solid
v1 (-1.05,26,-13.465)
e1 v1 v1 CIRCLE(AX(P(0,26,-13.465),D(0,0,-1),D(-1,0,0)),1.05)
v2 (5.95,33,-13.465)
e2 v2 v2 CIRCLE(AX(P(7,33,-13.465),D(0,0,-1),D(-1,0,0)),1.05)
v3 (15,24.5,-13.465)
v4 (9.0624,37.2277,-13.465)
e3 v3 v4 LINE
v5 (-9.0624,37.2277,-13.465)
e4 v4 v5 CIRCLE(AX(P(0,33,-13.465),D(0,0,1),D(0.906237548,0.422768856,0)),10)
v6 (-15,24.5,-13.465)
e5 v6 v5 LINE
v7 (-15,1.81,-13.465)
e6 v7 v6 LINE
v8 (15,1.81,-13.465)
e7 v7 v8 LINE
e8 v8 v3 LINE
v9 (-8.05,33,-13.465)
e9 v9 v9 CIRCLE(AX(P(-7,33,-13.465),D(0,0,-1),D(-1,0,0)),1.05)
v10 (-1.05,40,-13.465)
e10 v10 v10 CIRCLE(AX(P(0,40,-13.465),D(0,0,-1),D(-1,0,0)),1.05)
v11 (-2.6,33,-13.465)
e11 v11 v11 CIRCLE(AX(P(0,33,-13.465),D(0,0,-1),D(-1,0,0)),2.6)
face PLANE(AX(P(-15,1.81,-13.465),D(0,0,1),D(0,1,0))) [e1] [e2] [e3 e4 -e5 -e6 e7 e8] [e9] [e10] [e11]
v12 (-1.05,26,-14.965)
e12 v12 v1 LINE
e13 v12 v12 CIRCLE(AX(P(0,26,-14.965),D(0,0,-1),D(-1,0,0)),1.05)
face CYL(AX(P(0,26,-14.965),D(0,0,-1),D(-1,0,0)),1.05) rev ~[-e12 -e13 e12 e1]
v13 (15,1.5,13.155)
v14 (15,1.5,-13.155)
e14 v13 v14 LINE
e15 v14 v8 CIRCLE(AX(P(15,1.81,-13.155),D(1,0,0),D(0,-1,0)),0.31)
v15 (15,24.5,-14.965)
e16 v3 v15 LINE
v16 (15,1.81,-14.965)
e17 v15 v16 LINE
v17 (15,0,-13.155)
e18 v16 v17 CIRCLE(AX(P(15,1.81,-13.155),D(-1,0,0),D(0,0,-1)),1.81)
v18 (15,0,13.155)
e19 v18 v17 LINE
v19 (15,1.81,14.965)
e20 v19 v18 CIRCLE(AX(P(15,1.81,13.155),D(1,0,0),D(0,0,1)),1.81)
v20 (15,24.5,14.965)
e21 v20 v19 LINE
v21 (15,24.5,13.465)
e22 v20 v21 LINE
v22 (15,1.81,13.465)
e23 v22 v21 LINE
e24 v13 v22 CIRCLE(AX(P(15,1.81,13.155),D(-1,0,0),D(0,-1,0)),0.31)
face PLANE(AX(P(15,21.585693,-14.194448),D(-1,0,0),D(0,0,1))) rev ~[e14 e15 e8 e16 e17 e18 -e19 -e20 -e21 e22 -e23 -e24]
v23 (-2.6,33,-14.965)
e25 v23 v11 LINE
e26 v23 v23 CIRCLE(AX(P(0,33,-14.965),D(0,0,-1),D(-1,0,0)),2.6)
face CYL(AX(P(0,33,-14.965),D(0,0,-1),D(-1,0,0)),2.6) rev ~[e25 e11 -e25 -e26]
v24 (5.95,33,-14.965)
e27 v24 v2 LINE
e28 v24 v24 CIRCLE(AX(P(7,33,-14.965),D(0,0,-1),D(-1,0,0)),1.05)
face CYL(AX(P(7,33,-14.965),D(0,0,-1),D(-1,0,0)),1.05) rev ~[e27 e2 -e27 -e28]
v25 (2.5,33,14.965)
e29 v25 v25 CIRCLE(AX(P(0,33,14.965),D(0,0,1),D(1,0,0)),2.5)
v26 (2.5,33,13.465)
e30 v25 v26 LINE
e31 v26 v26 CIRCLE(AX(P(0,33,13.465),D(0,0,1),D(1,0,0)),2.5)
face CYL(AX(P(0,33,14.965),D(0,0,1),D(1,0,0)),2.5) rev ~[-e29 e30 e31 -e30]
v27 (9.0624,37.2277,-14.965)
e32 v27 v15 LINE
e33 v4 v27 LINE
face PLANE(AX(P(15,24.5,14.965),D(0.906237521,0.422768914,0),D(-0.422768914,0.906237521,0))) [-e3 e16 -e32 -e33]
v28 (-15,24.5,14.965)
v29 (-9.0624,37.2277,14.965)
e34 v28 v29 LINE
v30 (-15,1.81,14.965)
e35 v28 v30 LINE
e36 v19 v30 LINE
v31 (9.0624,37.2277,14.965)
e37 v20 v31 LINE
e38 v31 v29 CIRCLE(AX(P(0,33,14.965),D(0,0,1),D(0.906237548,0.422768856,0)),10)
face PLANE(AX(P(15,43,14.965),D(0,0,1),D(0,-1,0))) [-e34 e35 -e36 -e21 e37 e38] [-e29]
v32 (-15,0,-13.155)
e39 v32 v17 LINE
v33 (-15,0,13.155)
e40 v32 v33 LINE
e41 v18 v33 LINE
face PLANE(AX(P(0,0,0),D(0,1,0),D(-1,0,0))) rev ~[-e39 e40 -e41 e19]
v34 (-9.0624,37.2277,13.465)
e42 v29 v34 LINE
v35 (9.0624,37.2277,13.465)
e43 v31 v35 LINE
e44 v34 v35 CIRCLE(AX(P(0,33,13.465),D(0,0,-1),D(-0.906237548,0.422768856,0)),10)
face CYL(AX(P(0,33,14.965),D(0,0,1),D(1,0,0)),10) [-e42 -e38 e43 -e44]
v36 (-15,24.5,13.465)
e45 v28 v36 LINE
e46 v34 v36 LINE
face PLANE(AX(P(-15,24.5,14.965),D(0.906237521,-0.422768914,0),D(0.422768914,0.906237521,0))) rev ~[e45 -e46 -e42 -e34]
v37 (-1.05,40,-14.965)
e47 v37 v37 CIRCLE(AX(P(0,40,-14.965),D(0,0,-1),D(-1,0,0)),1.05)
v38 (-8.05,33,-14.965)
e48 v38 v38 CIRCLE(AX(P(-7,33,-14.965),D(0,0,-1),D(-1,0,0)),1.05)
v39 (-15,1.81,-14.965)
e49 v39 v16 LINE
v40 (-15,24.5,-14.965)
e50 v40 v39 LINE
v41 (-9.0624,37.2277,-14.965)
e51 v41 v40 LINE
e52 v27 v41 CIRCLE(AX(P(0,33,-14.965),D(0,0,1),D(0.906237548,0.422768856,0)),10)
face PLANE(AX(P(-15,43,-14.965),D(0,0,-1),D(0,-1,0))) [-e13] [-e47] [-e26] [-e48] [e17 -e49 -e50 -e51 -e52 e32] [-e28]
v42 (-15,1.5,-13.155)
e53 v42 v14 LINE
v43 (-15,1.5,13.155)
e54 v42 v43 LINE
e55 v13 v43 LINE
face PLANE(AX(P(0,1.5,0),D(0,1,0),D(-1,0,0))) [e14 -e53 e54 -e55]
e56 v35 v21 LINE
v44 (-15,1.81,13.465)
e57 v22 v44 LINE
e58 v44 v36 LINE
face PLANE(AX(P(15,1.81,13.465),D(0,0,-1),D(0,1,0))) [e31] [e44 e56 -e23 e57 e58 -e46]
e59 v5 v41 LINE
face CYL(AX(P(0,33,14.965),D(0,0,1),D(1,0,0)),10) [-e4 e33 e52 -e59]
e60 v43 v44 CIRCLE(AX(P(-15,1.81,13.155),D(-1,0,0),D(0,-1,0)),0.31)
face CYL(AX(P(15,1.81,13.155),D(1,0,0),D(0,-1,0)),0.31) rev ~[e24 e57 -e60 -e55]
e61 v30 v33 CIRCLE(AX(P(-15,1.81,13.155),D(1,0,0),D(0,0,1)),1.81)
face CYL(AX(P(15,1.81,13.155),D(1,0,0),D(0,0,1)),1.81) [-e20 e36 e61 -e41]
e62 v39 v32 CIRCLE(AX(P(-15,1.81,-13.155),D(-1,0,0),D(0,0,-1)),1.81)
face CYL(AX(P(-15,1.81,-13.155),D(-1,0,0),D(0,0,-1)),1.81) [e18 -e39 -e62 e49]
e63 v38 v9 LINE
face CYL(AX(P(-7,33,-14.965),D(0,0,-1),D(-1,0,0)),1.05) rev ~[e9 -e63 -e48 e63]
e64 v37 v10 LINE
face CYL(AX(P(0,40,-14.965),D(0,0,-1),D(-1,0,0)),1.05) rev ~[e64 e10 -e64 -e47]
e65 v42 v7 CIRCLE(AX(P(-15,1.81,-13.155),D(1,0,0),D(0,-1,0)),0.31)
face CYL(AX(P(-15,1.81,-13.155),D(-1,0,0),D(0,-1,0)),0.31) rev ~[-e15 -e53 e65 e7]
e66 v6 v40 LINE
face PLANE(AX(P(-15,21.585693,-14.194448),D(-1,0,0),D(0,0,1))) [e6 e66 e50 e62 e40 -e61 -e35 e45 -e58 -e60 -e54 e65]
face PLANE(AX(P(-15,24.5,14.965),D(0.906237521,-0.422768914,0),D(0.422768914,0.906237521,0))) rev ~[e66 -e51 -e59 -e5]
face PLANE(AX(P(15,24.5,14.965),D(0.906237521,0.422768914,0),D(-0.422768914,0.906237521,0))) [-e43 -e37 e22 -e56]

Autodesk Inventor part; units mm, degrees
ref_plane "YZ Plane" through (0, 0, 0) normal (1, 0, 0) x (0, 1, 0)
ref_plane "XZ Plane" through (0, 0, 0) normal (0, 1, 0) x (-1, 0, 0)
ref_plane "XY Plane" through (0, 0, 0) normal (0, 0, 1) x (1, 0, 0)
sketch "Sketch1" plane through (0, 0, 0) normal (0, 1, 0) x (-1, 0, 0)
  line L0 (15, 14.965) -> (-15, 14.965)
  line L1 (-15, 14.965) -> (-15, -14.965)
  line L2 (-15, -14.965) -> (15, -14.965)
  line L3 (15, -14.965) -> (15, 14.965)
  point P0 (0, 0)
  dimension "d0" = 29.93
  dimension "d1" = 30
  dimension "d2" = 15
  dimension "d3" = 14.965
extrude "Plate1" add sketch "Sketch1" along normal blind 1.5
sketch "Sketch2" plane through (-15, 0, -13.465) normal (0, 0, -1) x (-1, 0, 0)
  line L0 (-30, 0) -> (0, 0)
  line L1 (0, 0) -> (0, 43)
  line L2 (0, 43) -> (-30, 43)
  line L3 (-30, 43) -> (-30, 0)
edge flange "Flange1" height 43 angle 90 thickness 1.5 bend radius 0.31 thickness toward (0, 0, -1) relief tear relief width 1.5 relief depth 0.75 corner gap 0.31 corner form 0 edges at (0, 1.5, -14.965) (0, 1.5, 14.965) wall of the first edge with corners at (15, 0, -13.465) (-15, 0, -13.465) (-15, 43, -13.465) (15, 43, -13.465)
bend "Bend1"
corner "Corner1"
sketch "Sketch3" plane through (-15, 43, 14.965) normal (0, 0, 1) x (1, 0, 0)
  line L0 (0, 0) -> (30, 0) projected
  line L1 (0, -41.19) -> (0, 0) projected
  circle A0 centre (15, -10) radius 10
  line L2 (0, -18.5) -> (30, -18.5)
  line L3 (30, -18.5) -> (30, -28.5)
  line L4 (30, -28.5) -> (0, -28.5)
  line L5 (0, -28.5) -> (0, -18.5)
  line L6 (30, -18.5) -> (24.0624, -5.7723)
  line L7 (0, -18.5) -> (5.9376, -5.7723)
  line L8 (0, 0) -> (30, 0)
  line L9 (30, 0) -> (30, -25)
  line L10 (30, -25) -> (0, -25)
  line L11 (0, -25) -> (0, 0)
  point P0 (15, -43)
  point P1 (15, 0)
  dimension "d15" = 10
  dimension "d16" = 0
  dimension "d17" = 20
  dimension "d18" = 8.5
  dimension "d19" = 0
  dimension "d20" = 30
  dimension "d21" = 10
  dimension "d22" = 25
extrude "Extrusion1" cut sketch "Sketch3" against normal blind 35 contours L0 A0 L7 L1 | L0 L9 L6 A0
sketch "Sketch4" plane through (15, 1.81, -14.965) normal (0, 0, -1) x (-1, 0, 0)
  arc A0 (24.0624, 35.4177) -> (5.9376, 35.4177) centre (15, 31.19) ccw projected
  circle A1 centre (15, 31.19) radius 2.6
  circle A2 centre (8, 31.19) radius 1.05
  circle A3 centre (22, 31.19) radius 1.05
  circle A4 centre (15, 38.19) radius 1.05
  circle A5 centre (15, 24.19) radius 1.05
  point P0 (15, -1.81)
  dimension "d25" = 5.2
  dimension "d26" = 0
  dimension "d27" = 7
  dimension "d28" = 2.1
  dimension "d29" = 7
  dimension "d30" = 0
  dimension "d31" = 2.1
  dimension "d32" = 0
  dimension "d33" = 7
  dimension "d34" = 2.1
  dimension "d35" = 7
  dimension "d36" = 0
  dimension "d37" = 2.1
extrude "Extrusion2" cut sketch "Sketch4" against normal blind 1.5
sketch "Sketch5" plane through (-15, 1.81, 14.965) normal (0, 0, 1) x (1, 0, 0)
  arc A0 (24.0624, 35.4177) -> (5.9376, 35.4177) centre (15, 31.19) ccw projected
  circle A1 centre (15, 31.19) radius 2.5
  point P0 (15, -1.81)
  dimension "d40" = 5
extrude "Extrusion3" cut sketch "Sketch5" against normal blind 1.5
equation "\"d4\" = Thickness"
equation "\"d5\" = BendReliefWidth"
equation "\"d6\" = BendReliefDepth"
equation "\"d7\" = MinimumRemnant"
equation "\"d8\" = TransitionRadius"
equation "\"d11\" = BendRadius"
equation "\"d12\" = CornerReliefSize"
equation "\"d13\" = GapSize"
equation "\"d14\" = JacobiRadiusSize"
equation "\"BendReliefWidth\" = Thickness"
equation "\"BendReliefDepth\" = 0.5 * Thickness"
equation "\"CornerReliefSize\" = 4 * Thickness"
equation "\"MinimumRemnant\" = 2 * Thickness"
equation "\"TransitionRadius\" = BendRadius"
equation "\"JacobiRadiusSize\" = BendRadius"
equation "\"GapSize\" = Thickness"
equation "\"Thickness\" = 1.5"
equation "\"BendRadius\" = 0.31"
properties part number "partpart" material "Aluminum 6061-AHC"
